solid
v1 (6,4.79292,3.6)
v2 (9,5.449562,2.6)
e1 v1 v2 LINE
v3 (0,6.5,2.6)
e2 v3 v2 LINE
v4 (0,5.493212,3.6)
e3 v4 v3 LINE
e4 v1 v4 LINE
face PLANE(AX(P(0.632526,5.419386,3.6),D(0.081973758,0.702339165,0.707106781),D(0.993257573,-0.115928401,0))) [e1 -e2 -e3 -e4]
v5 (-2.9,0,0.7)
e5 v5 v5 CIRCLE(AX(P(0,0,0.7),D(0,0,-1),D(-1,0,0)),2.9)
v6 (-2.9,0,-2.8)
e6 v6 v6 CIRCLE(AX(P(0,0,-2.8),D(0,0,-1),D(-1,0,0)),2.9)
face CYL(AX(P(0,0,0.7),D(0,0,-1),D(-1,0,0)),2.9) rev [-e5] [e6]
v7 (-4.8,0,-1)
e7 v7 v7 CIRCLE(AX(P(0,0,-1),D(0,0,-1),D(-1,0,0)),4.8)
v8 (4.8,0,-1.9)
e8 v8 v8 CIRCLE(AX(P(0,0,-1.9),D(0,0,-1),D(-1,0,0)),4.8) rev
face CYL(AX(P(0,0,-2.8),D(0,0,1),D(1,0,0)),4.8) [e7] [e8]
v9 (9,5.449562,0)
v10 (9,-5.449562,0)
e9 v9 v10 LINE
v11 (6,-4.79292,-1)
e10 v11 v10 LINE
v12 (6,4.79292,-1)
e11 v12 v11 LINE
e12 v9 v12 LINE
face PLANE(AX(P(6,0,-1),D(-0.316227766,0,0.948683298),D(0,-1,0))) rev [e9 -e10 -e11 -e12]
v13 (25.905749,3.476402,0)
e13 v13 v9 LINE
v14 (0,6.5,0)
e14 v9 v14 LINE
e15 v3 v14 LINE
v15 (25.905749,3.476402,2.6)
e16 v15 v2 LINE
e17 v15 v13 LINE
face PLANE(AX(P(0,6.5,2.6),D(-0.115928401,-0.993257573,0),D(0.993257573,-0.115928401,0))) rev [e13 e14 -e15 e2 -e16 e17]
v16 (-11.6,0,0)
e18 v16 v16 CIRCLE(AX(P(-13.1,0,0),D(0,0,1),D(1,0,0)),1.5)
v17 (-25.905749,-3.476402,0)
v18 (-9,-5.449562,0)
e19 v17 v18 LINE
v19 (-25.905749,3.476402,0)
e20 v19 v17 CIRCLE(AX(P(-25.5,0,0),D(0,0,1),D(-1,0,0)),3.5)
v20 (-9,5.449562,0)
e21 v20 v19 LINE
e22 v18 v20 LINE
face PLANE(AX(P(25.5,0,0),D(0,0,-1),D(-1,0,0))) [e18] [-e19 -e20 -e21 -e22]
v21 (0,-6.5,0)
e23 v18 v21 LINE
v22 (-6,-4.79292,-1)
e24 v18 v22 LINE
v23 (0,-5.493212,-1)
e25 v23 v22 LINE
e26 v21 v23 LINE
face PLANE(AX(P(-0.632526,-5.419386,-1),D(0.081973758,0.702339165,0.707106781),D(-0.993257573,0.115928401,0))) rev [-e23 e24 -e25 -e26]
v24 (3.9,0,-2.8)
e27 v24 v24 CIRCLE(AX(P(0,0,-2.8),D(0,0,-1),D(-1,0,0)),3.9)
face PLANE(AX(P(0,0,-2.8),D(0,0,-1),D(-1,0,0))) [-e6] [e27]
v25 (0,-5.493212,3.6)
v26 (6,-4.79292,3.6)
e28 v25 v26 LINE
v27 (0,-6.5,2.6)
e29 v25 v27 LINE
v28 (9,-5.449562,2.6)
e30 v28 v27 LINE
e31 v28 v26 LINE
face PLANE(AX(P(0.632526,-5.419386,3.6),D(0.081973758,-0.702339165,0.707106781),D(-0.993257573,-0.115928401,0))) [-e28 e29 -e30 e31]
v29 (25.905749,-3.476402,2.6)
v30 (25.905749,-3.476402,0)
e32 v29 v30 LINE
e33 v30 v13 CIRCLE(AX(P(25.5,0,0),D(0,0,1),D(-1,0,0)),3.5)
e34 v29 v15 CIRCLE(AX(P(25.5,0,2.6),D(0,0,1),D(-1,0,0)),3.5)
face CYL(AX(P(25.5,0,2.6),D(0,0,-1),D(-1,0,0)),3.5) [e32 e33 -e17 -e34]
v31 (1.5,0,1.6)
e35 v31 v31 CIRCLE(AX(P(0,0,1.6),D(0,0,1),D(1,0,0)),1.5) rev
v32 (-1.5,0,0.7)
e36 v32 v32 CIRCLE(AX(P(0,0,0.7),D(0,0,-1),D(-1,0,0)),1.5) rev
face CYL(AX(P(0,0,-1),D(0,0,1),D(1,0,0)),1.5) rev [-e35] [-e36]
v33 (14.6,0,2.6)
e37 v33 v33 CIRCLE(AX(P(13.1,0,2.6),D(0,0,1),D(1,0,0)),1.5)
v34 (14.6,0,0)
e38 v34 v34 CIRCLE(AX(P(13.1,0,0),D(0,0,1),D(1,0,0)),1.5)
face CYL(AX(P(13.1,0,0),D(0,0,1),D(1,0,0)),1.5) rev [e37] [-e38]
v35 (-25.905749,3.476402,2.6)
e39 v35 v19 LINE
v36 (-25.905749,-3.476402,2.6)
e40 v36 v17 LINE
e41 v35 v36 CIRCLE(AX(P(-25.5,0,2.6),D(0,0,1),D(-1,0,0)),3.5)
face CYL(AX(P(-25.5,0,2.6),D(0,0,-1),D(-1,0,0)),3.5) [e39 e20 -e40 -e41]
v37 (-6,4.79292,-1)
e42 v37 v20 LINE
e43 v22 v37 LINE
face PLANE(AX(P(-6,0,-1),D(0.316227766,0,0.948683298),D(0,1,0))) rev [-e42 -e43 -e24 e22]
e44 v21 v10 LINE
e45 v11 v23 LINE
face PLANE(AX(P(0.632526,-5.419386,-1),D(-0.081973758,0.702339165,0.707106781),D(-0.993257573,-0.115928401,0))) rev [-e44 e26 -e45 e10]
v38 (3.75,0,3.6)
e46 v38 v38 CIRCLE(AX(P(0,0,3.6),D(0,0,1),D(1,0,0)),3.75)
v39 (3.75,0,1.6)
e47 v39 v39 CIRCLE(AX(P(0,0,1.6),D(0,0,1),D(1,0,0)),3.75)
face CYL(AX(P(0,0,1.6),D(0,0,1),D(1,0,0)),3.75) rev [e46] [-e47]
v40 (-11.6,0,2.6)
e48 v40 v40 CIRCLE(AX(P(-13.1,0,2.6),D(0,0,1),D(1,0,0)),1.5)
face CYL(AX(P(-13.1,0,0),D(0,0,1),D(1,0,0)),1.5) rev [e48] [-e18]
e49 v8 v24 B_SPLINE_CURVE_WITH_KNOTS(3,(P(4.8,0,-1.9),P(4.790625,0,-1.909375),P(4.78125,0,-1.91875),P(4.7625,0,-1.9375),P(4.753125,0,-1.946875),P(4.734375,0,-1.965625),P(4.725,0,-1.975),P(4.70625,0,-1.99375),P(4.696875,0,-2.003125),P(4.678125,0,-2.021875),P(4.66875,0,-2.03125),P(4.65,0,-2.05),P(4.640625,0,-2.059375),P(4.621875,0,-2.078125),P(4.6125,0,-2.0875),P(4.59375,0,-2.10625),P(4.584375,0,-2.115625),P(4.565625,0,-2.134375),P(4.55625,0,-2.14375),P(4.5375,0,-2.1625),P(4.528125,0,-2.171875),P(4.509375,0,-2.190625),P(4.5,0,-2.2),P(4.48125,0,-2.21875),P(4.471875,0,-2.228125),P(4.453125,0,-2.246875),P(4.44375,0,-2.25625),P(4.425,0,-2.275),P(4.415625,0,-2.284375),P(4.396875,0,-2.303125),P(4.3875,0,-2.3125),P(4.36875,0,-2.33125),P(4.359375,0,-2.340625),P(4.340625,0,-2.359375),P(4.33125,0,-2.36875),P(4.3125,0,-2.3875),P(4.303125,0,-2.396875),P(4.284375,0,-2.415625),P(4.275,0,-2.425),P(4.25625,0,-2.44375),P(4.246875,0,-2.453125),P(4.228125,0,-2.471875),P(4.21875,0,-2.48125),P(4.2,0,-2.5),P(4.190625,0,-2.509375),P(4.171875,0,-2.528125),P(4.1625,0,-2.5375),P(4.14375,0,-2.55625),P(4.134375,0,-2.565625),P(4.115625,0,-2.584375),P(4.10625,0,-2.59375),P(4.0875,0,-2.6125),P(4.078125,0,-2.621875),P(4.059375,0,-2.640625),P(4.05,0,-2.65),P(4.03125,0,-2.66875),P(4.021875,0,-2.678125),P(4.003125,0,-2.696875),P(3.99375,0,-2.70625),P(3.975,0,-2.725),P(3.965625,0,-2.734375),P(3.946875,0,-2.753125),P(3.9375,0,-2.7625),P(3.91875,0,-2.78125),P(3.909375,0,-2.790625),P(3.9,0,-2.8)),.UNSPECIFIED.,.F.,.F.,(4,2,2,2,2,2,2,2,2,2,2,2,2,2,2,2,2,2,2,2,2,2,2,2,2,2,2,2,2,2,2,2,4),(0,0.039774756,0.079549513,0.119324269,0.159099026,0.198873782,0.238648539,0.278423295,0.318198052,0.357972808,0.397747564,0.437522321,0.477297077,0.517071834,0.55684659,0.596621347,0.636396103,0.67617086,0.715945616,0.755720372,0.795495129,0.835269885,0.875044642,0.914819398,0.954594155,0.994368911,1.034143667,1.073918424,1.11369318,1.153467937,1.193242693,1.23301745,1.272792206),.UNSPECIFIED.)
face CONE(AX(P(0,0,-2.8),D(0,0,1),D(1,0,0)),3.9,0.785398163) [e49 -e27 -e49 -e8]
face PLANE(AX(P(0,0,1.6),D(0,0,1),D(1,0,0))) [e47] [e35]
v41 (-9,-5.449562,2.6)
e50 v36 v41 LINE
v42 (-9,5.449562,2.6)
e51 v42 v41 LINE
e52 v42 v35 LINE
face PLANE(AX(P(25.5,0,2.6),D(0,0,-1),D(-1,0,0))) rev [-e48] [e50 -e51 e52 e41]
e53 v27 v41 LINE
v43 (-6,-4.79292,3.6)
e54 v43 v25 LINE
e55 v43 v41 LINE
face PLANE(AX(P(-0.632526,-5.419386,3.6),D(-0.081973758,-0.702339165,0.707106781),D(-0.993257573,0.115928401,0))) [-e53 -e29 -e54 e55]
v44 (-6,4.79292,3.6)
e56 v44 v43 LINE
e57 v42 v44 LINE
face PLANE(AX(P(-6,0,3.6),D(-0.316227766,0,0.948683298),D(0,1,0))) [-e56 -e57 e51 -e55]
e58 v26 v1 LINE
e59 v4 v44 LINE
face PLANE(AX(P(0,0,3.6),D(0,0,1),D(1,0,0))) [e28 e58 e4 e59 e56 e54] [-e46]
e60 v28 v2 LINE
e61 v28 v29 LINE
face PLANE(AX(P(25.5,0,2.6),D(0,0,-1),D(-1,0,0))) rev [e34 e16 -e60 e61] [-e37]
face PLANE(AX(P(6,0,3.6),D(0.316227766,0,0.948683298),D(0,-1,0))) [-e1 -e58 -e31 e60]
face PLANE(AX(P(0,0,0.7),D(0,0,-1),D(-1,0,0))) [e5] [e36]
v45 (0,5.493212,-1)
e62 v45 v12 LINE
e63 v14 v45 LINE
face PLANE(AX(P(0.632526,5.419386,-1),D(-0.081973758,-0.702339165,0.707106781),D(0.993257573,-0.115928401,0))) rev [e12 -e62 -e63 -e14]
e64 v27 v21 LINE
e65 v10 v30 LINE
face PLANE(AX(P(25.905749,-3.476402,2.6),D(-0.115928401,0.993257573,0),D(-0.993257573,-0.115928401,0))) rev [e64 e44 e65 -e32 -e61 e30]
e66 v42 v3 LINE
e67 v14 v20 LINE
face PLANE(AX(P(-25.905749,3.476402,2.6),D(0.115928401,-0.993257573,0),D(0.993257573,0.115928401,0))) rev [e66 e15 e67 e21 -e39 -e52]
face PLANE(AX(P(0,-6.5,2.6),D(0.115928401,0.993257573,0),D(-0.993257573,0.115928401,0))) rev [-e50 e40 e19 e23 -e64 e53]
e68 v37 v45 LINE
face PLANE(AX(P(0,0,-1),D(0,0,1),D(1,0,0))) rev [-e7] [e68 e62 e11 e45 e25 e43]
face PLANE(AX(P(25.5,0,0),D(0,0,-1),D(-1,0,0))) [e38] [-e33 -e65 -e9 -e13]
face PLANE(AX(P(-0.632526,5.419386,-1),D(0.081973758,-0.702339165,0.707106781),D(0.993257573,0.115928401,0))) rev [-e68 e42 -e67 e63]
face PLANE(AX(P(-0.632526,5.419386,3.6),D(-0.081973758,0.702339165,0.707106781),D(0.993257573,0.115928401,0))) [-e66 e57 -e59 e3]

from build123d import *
from OCP.BRepFilletAPI import BRepFilletAPI_MakeChamfer

# Parameters (mm, degrees)
EXTRUDE_1_DEPTH     = 2.6
SKETCH_8_R          = 1.4999999999999987
CUT_EXTRUDE_4_DEPTH = 30.833035380262615
EXTRUDE_2_DEPTH     = 1
CHAMFER_1_SIZE      = 1
CHAMFER_2_SIZE      = 1
CHAMFER_2_SIZE_2    = 3
EXTRUDE_3_DEPTH     = 1
SKETCH_3_R          = 1.5
CUT_EXTRUDE_1_DEPTH = 31.073410182418638
SKETCH_4_R          = 3.75
CUT_EXTRUDE_2_DEPTH = 2
CHAMFER_3_SIZE      = 1
CHAMFER_4_SIZE      = 1
CHAMFER_4_SIZE_2    = 3
SKETCH_6_R          = 4.8
EXTRUDE_4_DEPTH     = 1.8000000000000007
CHAMFER_5_SIZE      = 0.9
SKETCH_7_R          = 2.9
CUT_EXTRUDE_3_DEPTH = 3.5


with BuildPart() as part:
    # ｽｹｯﾁ1 → ﾎﾞｽ - 押し出し1 (new body)
    with BuildSketch(Plane.XY):
        with BuildLine():
            Line((8e-16, 6.5), (25.905749403157248, 3.4764015046938295))
            ThreePointArc((25.905749403157248, 3.4764015046938295), (28.999999999999996, 6.4e-16), (25.905749403157248, -3.476401504693828))
            Line((25.905749403157248, -3.476401504693828), (8e-16, -6.5))
            Line((8e-16, -6.5), (-25.905749403157248, -3.476401504693854))
            ThreePointArc((-25.905749403157248, -3.476401504693854), (-29.000000000000018, -6.03e-15), (-25.905749403157248, 3.4764015046938423))
            Line((-25.905749403157248, 3.4764015046938423), (8e-16, 6.5))
        make_face()
    extrude(amount=EXTRUDE_1_DEPTH)

    # ｽｹｯﾁ8 → ｶｯﾄ - 押し出し4 (cut, through all)
    with BuildSketch(Plane.XY.offset(2.6)):
        with Locations((13.1, 0)):
            Circle(SKETCH_8_R)
        with Locations((-13.1, -1.6e-15)):
            Circle(SKETCH_8_R)
    extrude(amount=-CUT_EXTRUDE_4_DEPTH, mode=Mode.SUBTRACT)

    # ｽｹｯﾁ2 → ﾎﾞｽ - 押し出し2 (add)
    with BuildSketch(Plane.XY.offset(2.6)):
        Polygon((-9.000000000000002, 5.4495618893604005), (-9.000000000000002, -5.449561889360406), (8e-16, -6.5), (9, -5.4495618893604), (9, 5.449561889360396), (8e-16, 6.5), align=None)
    extrude(amount=EXTRUDE_2_DEPTH)

    # 面取り1
    chamfer_1_edges = [part.edges().sort_by_distance(p)[0] for p in [
        (4.500000000000001, -5.9747809446802, 3.6),
        (-4.500000000000001, -5.974780944680203, 3.6),
        (-4.5, 5.9747809446802, 3.6),
        (4.5, 5.974780944680198, 3.6),
    ]]
    chamfer(chamfer_1_edges, length=CHAMFER_1_SIZE)

    # 面取り2
    chamfer_2_edges_1 = [part.edges().sort_by_distance(p)[0] for p in [
        (9, 0, 3.6),
    ]]
    chamfer_2_side_1 = [part.faces().sort_by_distance(p)[0] for p in [
        (9, 0, 3.58),
    ]]
    chamfer_2_edges_2 = [part.edges().sort_by_distance(p)[0] for p in [
        (-9.000000000000002, -8.9e-16, 3.6),
    ]]
    chamfer_2_side_2 = [part.faces().sort_by_distance(p)[0] for p in [
        (-8.980000000000002, -8.9e-16, 3.6),
    ]]
    chamfer_2 = BRepFilletAPI_MakeChamfer(part.part.solid().wrapped)
    for e in chamfer_2_edges_1:
        chamfer_2.Add(CHAMFER_2_SIZE - 0.0001, CHAMFER_2_SIZE_2 - 0.0001, e.wrapped, chamfer_2_side_1[0].wrapped)
    for e in chamfer_2_edges_2:
        chamfer_2.Add(CHAMFER_2_SIZE_2 - 0.0001, CHAMFER_2_SIZE - 0.0001, e.wrapped, chamfer_2_side_2[0].wrapped)
    add(Compound.cast(chamfer_2.Shape()), mode=Mode.REPLACE)  # a hair under: the kernel refuses the full size

    # ｽｹｯﾁ5 → ﾎﾞｽ - 押し出し3 (add)
    with BuildSketch(Plane(origin=(0, 0, 0), x_dir=(-1, 0, 0), z_dir=(0, 0, -1))):
        Polygon((8.999999999999998, 5.449561889360397), (9, -5.449561889360403), (-8e-16, -6.5), (-9, -5.449561889360396), (-9, 5.449561889360396), (-8e-16, 6.5), align=None)
    extrude(amount=EXTRUDE_3_DEPTH)

    # ｽｹｯﾁ3 → ｶｯﾄ - 押し出し1 (cut, through all)
    with BuildSketch(Plane.XY.offset(3.6)):
        Circle(SKETCH_3_R)
    extrude(amount=-CUT_EXTRUDE_1_DEPTH, mode=Mode.SUBTRACT)

    # ｽｹｯﾁ4 → ｶｯﾄ - 押し出し2 (cut)
    with BuildSketch(Plane.XY.offset(3.6)):
        Circle(SKETCH_4_R)
    extrude(amount=-CUT_EXTRUDE_2_DEPTH, mode=Mode.SUBTRACT)

    # 面取り3
    chamfer_3_edges = [part.edges().sort_by_distance(p)[0] for p in [
        (-4.499999999999998, 5.974780944680198, -1),
        (4.5, 5.974780944680198, -1),
        (4.500000000000001, -5.974780944680198, -1),
        (-4.5, -5.974780944680202, -1),
    ]]
    chamfer(chamfer_3_edges, length=CHAMFER_3_SIZE)

    # 面取り4
    chamfer_4_edges_1 = [part.edges().sort_by_distance(p)[0] for p in [
        (9, 0, -1),
    ]]
    chamfer_4_side_1 = [part.faces().sort_by_distance(p)[0] for p in [
        (9, 0, -0.98),
    ]]
    chamfer_4_edges_2 = [part.edges().sort_by_distance(p)[0] for p in [
        (-8.999999999999998, -1.78e-15, -1),
    ]]
    chamfer_4_side_2 = [part.faces().sort_by_distance(p)[0] for p in [
        (-8.979999999999999, -1.78e-15, -1),
    ]]
    chamfer_4 = BRepFilletAPI_MakeChamfer(part.part.solid().wrapped)
    for e in chamfer_4_edges_1:
        chamfer_4.Add(CHAMFER_4_SIZE - 0.0001, CHAMFER_4_SIZE_2 - 0.0001, e.wrapped, chamfer_4_side_1[0].wrapped)
    for e in chamfer_4_edges_2:
        chamfer_4.Add(CHAMFER_4_SIZE_2 - 0.0001, CHAMFER_4_SIZE - 0.0001, e.wrapped, chamfer_4_side_2[0].wrapped)
    add(Compound.cast(chamfer_4.Shape()), mode=Mode.REPLACE)  # a hair under: the kernel refuses the full size

    # ｽｹｯﾁ6 → ﾎﾞｽ - 押し出し4 (add)
    with BuildSketch(Plane(origin=(0, 0, -1), x_dir=(-1, 0, 0), z_dir=(0, 0, -1))):
        Circle(SKETCH_6_R)
    extrude(amount=EXTRUDE_4_DEPTH)

    # 面取り5
    chamfer_5_edges = [part.edges().sort_by_distance(p)[0] for p in [
        (4.800000000000001, -2.88e-15, -2.8000000000000007),
    ]]
    chamfer(chamfer_5_edges, length=CHAMFER_5_SIZE)

    # ｽｹｯﾁ7 → ｶｯﾄ - 押し出し3 (cut)
    with BuildSketch(Plane(origin=(0, 0, -2.8000000000000007), x_dir=(-1, 0, 0), z_dir=(0, 0, -1))):
        Circle(SKETCH_7_R)
    extrude(amount=-CUT_EXTRUDE_3_DEPTH, mode=Mode.SUBTRACT)


solid = part.part
